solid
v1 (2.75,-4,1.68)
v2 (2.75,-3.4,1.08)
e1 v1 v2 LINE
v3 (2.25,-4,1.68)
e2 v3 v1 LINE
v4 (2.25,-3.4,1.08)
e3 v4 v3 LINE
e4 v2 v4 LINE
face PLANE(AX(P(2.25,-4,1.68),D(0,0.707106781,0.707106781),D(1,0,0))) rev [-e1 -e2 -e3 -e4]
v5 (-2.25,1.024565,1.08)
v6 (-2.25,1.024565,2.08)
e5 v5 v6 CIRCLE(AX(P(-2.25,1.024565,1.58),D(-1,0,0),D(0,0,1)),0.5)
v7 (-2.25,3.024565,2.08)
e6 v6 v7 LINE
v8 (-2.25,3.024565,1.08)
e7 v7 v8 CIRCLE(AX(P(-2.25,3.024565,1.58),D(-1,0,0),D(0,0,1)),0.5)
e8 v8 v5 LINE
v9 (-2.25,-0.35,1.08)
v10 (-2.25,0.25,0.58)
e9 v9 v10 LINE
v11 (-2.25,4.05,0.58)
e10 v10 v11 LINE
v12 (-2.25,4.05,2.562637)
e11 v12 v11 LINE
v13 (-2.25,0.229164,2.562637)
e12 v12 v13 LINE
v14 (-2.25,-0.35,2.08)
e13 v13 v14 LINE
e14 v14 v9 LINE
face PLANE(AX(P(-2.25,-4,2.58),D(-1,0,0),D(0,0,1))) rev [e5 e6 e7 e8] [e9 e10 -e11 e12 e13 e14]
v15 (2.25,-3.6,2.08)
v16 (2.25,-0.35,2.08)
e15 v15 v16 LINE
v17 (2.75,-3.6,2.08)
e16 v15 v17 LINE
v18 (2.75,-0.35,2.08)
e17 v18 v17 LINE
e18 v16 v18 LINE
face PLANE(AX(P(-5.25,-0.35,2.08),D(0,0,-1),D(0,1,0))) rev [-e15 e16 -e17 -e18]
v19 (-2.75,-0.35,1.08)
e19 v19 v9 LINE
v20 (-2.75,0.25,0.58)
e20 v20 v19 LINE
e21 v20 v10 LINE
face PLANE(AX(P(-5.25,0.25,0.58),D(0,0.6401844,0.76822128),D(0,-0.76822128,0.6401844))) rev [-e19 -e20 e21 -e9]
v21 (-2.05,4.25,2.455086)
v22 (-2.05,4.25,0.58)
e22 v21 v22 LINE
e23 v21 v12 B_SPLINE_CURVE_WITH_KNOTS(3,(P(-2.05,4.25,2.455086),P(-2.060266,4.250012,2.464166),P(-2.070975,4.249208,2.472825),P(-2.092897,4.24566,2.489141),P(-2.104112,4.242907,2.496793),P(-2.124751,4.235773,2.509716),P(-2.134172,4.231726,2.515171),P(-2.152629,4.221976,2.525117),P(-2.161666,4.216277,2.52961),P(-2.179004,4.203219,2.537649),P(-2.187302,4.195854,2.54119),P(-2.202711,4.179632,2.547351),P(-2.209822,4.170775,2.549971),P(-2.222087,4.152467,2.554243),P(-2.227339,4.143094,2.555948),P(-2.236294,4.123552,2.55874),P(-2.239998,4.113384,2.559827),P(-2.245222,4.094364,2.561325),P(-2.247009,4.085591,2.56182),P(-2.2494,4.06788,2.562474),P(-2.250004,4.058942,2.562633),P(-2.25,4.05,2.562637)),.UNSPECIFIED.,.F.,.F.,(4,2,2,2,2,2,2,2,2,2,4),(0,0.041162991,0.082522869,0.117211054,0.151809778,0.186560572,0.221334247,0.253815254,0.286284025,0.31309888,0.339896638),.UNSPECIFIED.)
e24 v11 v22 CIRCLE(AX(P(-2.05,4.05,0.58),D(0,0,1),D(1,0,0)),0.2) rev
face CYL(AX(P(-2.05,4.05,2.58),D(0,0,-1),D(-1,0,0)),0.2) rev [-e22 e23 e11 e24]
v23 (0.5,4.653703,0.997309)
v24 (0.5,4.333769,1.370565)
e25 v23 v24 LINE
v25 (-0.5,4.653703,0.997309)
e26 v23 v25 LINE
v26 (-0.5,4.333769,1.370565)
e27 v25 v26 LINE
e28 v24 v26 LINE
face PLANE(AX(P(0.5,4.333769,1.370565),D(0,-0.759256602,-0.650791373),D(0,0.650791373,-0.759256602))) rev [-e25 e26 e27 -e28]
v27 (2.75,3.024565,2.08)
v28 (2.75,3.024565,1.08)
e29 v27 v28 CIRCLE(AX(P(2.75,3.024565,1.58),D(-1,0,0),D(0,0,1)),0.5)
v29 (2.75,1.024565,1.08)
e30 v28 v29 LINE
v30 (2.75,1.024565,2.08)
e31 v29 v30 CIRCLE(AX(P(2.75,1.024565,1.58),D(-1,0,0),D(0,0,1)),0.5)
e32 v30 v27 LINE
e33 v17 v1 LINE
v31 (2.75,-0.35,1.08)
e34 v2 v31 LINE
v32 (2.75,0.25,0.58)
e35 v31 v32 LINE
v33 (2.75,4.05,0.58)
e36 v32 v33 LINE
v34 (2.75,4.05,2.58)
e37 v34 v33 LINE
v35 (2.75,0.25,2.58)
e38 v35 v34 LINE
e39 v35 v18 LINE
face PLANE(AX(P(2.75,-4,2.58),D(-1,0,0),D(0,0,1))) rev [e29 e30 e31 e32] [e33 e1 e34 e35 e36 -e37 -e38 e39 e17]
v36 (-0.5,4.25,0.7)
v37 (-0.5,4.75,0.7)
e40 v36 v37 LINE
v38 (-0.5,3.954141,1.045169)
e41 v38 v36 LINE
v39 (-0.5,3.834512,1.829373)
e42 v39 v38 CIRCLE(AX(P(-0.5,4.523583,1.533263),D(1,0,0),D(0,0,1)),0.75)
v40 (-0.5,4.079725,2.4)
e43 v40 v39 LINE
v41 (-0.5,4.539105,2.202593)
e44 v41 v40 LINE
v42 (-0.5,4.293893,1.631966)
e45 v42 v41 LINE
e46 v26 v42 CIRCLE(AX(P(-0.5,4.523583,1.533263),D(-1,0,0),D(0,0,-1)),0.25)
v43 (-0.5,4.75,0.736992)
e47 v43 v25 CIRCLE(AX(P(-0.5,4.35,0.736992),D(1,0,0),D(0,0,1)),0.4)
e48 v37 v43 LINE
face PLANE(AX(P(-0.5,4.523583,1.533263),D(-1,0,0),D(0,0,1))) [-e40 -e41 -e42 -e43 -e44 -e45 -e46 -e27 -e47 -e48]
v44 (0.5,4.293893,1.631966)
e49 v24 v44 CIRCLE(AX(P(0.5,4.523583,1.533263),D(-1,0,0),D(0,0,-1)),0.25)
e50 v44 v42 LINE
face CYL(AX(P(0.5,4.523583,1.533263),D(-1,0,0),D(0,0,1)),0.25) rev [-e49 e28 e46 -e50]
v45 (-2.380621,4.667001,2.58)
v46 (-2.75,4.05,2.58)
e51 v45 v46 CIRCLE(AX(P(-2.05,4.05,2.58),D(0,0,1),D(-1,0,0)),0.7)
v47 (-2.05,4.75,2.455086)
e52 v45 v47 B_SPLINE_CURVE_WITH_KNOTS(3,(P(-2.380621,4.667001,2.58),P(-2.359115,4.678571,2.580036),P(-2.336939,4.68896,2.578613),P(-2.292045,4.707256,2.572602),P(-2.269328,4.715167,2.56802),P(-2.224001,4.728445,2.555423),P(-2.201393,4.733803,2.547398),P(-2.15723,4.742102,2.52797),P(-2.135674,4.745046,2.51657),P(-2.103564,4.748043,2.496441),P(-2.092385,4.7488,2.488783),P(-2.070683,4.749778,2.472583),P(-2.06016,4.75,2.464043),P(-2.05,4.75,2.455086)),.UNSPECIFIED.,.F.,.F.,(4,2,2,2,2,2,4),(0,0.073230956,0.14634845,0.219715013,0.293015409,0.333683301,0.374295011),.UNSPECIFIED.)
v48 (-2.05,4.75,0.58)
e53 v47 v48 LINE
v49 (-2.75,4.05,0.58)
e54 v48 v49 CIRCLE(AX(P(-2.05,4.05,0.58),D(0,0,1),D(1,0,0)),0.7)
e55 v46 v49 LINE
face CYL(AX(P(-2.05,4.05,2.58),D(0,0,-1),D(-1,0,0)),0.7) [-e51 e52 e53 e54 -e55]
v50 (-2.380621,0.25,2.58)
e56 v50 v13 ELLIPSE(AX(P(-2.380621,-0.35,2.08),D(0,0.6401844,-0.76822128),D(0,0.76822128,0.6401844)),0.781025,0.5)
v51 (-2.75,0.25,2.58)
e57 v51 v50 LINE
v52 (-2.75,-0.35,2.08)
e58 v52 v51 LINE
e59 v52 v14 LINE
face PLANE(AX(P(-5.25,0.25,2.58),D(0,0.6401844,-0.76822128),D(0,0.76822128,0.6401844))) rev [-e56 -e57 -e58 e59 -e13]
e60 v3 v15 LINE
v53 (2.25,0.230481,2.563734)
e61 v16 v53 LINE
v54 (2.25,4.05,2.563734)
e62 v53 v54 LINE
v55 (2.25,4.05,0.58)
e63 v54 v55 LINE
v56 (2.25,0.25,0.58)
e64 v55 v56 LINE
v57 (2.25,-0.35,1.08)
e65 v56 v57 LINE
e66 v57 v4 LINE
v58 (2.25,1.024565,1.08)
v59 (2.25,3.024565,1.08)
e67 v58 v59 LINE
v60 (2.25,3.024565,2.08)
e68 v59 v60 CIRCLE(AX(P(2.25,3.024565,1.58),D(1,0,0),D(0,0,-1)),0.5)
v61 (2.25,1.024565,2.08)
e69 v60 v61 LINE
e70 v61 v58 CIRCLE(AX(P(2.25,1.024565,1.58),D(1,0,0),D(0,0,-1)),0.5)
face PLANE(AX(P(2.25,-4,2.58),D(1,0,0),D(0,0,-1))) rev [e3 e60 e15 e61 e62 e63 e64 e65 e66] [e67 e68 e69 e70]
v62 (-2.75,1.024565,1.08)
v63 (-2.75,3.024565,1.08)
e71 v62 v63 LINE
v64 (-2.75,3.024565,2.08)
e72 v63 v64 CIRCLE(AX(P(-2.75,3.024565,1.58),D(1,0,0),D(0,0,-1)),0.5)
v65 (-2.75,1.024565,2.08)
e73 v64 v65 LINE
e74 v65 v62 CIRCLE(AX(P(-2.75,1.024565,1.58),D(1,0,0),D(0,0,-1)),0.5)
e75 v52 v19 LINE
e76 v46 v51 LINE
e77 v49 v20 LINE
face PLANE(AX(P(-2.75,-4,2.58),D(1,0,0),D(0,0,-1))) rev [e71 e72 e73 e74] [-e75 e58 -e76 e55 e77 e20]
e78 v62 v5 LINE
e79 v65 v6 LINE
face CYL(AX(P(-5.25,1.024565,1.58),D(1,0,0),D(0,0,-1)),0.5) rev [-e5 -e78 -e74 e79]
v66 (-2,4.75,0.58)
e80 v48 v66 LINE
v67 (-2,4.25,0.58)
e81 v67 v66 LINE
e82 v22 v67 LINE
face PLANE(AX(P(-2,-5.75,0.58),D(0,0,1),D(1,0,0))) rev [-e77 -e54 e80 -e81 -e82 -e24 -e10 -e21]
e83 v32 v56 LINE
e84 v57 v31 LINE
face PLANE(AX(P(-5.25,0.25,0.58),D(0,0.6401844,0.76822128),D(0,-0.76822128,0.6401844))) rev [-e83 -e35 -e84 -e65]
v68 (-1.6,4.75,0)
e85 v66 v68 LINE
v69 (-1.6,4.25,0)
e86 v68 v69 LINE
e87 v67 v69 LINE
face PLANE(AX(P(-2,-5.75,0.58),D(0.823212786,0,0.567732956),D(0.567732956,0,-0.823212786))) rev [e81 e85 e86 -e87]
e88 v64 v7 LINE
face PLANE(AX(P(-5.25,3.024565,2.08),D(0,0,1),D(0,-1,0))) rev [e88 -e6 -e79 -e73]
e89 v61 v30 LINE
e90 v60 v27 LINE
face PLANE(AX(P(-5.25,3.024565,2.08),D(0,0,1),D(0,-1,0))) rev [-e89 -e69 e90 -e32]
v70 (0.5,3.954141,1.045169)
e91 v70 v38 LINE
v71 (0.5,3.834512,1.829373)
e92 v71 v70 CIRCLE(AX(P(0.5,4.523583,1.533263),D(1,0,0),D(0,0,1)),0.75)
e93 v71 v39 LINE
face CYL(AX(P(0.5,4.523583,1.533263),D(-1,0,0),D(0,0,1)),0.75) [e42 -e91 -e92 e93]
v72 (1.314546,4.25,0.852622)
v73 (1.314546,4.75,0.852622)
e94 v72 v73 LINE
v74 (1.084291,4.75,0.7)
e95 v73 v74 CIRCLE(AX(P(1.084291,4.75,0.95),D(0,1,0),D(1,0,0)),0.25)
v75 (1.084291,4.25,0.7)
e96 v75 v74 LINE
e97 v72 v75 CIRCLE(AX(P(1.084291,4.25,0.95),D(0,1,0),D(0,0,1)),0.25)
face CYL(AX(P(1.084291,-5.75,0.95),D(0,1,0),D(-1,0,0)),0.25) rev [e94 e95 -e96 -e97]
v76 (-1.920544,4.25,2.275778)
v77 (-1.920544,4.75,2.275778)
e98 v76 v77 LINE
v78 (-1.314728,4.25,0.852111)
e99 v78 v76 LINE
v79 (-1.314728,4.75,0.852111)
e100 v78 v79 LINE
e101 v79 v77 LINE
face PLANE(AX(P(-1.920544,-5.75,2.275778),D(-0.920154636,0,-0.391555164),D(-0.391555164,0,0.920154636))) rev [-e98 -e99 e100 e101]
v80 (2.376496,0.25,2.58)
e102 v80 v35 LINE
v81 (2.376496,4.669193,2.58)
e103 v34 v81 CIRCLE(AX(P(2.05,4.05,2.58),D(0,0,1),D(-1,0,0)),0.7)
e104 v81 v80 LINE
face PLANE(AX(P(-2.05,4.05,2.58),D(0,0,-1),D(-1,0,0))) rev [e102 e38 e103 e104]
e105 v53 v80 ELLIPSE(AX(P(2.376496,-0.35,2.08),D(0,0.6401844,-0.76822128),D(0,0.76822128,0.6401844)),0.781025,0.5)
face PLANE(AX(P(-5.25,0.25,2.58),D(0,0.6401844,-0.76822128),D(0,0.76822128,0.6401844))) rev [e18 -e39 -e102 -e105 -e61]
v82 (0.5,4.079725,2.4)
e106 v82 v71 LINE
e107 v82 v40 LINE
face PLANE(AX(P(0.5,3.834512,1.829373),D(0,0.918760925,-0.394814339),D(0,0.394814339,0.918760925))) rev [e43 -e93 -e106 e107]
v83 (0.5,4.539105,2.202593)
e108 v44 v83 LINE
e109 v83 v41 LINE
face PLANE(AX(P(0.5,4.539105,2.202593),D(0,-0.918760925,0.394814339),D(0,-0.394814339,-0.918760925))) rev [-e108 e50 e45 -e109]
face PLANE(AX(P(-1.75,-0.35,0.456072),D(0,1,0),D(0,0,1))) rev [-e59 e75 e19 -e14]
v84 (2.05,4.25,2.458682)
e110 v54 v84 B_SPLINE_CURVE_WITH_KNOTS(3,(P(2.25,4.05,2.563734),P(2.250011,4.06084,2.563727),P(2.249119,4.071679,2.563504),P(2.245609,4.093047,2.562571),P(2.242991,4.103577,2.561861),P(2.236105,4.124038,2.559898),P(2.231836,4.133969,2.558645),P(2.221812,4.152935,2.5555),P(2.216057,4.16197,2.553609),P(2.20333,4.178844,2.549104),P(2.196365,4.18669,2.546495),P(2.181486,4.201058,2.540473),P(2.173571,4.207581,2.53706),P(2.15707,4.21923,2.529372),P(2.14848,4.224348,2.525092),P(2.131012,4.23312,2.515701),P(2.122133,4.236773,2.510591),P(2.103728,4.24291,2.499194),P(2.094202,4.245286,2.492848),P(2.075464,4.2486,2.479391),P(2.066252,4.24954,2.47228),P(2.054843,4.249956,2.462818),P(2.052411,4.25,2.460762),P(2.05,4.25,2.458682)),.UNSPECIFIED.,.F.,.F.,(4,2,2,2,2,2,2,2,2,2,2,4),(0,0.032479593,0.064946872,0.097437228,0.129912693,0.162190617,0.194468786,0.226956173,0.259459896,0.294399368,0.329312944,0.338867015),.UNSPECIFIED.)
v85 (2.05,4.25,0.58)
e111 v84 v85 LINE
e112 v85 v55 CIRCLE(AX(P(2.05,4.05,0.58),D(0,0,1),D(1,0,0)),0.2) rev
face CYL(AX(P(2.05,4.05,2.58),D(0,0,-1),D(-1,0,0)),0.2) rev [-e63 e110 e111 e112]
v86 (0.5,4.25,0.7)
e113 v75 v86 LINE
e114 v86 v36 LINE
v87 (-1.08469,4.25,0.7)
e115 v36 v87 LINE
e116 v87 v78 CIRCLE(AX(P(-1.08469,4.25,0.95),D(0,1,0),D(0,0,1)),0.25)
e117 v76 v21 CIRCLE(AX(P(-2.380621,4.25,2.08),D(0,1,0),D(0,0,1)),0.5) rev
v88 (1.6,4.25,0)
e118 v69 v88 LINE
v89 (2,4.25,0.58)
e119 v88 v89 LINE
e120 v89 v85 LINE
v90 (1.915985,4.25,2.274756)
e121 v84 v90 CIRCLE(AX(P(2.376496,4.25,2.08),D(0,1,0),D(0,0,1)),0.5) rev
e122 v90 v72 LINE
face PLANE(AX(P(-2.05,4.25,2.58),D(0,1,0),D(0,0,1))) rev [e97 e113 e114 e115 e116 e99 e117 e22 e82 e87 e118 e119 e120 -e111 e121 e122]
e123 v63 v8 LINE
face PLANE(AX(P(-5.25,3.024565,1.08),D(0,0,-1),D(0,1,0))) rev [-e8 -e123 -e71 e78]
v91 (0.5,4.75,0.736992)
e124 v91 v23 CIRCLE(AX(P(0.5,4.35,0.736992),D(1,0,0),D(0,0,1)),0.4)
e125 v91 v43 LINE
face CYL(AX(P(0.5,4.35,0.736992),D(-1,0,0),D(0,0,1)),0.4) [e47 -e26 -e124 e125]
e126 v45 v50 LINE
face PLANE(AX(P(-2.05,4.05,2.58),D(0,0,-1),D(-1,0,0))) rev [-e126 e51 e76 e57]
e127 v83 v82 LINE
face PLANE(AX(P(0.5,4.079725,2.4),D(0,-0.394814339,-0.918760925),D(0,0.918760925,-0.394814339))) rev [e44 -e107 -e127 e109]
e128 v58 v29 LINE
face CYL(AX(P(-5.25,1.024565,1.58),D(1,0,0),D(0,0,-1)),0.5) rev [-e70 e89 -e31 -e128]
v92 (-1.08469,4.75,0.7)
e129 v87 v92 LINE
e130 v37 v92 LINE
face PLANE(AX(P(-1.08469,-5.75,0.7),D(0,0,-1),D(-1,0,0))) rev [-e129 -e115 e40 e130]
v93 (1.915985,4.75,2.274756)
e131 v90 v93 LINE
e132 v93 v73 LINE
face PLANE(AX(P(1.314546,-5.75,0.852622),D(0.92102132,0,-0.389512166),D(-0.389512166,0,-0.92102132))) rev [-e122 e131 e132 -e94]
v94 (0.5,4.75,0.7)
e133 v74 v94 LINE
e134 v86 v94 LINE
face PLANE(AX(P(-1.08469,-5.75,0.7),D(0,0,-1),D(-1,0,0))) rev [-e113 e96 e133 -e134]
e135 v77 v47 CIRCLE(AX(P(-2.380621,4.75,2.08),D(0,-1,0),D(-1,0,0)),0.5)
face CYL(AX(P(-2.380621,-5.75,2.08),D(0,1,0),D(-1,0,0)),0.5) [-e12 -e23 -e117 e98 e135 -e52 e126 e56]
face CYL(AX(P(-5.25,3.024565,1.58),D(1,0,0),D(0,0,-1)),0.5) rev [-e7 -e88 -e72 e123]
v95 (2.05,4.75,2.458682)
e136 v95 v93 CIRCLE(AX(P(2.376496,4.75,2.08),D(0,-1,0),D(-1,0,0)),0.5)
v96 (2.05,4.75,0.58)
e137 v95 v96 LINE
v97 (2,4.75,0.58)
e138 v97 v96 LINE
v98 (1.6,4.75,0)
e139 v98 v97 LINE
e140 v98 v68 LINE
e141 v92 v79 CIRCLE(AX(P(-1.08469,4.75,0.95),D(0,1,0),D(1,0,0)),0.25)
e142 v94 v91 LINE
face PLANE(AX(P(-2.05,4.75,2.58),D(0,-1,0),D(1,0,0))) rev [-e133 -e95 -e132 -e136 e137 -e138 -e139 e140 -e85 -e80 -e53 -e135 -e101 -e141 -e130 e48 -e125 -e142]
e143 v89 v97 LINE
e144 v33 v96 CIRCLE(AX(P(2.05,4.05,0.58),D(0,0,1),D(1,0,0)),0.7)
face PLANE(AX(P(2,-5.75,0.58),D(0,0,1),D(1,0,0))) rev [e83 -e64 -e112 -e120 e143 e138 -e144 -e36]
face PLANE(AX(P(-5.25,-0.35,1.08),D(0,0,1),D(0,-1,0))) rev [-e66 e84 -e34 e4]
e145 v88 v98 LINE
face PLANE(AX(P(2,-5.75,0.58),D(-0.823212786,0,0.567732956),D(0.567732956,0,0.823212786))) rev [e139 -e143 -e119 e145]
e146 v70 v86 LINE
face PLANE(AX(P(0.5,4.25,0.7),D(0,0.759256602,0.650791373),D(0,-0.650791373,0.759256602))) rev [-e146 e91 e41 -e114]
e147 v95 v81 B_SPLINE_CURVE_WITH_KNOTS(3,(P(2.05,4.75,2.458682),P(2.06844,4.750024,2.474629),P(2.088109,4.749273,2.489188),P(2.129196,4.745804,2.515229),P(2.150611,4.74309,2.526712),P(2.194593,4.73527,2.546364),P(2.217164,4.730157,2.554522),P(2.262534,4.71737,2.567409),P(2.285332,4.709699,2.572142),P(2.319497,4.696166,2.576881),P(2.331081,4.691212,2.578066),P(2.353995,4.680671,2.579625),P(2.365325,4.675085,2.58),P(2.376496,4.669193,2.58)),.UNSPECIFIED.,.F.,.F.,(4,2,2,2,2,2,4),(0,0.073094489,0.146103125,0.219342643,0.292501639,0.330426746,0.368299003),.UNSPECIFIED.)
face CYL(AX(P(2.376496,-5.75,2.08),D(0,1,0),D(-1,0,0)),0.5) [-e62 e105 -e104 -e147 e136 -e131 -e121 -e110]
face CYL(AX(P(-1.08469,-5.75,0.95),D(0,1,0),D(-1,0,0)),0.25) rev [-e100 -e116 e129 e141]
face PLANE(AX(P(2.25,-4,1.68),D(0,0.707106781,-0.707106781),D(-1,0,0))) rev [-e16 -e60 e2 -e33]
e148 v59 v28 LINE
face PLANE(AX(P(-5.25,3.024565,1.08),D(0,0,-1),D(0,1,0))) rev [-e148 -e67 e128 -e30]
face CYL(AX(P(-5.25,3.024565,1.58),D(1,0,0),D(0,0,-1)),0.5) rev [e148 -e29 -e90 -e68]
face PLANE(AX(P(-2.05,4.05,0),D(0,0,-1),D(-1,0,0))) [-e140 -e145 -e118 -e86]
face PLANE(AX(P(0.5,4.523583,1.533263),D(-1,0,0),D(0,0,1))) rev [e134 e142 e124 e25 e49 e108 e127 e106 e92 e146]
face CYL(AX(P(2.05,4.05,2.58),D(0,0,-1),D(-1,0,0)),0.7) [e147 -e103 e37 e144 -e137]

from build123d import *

# Parameters (mm, degrees)
BOSS_EXTRUDE1_DEPTH = 2.58
CUT_EXTRUDE1_DEPTH  = 10.5
CUT_EXTRUDE2_DEPTH  = 5.25
BOSS_EXTRUDE2_DEPTH = 0.5
SKETCH5_W           = 2.430822105
SKETCH5_H           = 5.029930807
CUT_EXTRUDE3_DEPTH  = 1
CHAMFER1_SIZE       = 0.6
CHAMFER2_SIZE       = 0.4


with BuildPart() as part:
    # Sketch1 → Boss-Extrude1 (new body)
    with BuildSketch(Plane.XY):
        with BuildLine():
            Line((-2.75, -4), (-2.75, 4.05))
            ThreePointArc((-2.75, 4.05), (-2.544974747, 4.544974747), (-2.05, 4.75))
            Line((-2.05, 4.75), (2.05, 4.75))
            ThreePointArc((2.05, 4.75), (2.544974747, 4.544974747), (2.75, 4.05))
            Line((2.75, 4.05), (2.75, -4))
            Line((2.75, -4), (2.25, -4))
            Line((2.25, -4), (2.25, 4.05))
            ThreePointArc((2.25, 4.05), (2.191421356, 4.191421356), (2.05, 4.25))
            Line((2.05, 4.25), (-2.05, 4.25))
            ThreePointArc((-2.05, 4.25), (-2.191421356, 4.191421356), (-2.25, 4.05))
            Line((-2.25, 4.05), (-2.25, -4))
            Line((-2.25, -4), (-2.75, -4))
        make_face()
    extrude(amount=BOSS_EXTRUDE1_DEPTH)

    # Sketch2 → Cut-Extrude1 (cut)
    with BuildSketch(Plane(origin=(0, 4.75, 0), x_dir=(1, 0, 0), z_dir=(0, 1, 0))):
        Polygon((-2, -0.58), (-4.099439411, -0.58), (-4.099439411, 0.833357165), (-2, 0.833357165), (-1.6, 0), align=None)
        Polygon((2, -0.58), (3.357409655, -0.58), (3.357409655, 0.833357165), (2, 0.833357165), (1.6, 0), align=None)
        with BuildLine():
            Line((-2.75, -2.58), (-2.38062097, -2.58))
            ThreePointArc((-2.38062097, -2.58), (-2.104839164, -2.497066416), (-1.920543652, -2.275777582))
            Line((-1.920543652, -2.275777582), (-1.314728174, -0.852111209))
            ThreePointArc((-1.314728174, -0.852111209), (-1.222580418, -0.741466792), (-1.084689515, -0.7))
            Line((-1.084689515, -0.7), (1.084290526, -0.7))
            ThreePointArc((1.084290526, -0.7), (1.222412736, -0.741619926), (1.314545856, -0.852621958))
            Line((1.314545856, -0.852621958), (1.915985292, -2.274756083))
            ThreePointArc((1.915985292, -2.274756083), (2.100251533, -2.496760148), (2.376495952, -2.58))
            Line((2.376495952, -2.58), (2.75, -2.58))
            Line((2.75, -2.58), (2.75, -3.056093585))
            Line((2.75, -3.056093585), (-2.75, -3.056093585))
            Line((-2.75, -3.056093585), (-2.75, -2.58))
        make_face()
    extrude(amount=-CUT_EXTRUDE1_DEPTH, mode=Mode.SUBTRACT)

    # Sketch3 → Cut-Extrude2 (cut, symmetric)
    with BuildSketch(Plane(origin=(0, 0, 0), x_dir=(0, 0, -1), z_dir=(1, 0, 0))):
        Polygon((-0.58, 0.25), (-1.08, -0.35), (-1.08, -4.396314828), (-0.130305992, -4.396314828), (-0.130305992, 0.25), align=None)
        Polygon((-2.58, 0.25), (-2.08, -0.35), (-2.08, -4.896314828), (-3.070294312, -4.896314828), (-3.070294312, 0.25), align=None)
        with BuildLine():
            Line((-1.08, 3.024565065), (-1.08, 1.024565065))
            ThreePointArc((-1.08, 1.024565065), (-1.58, 0.524565065), (-2.08, 1.024565065))
            Line((-2.08, 1.024565065), (-2.08, 3.024565065))
            ThreePointArc((-2.08, 3.024565065), (-1.58, 3.524565065), (-1.08, 3.024565065))
        make_face()
    extrude(amount=CUT_EXTRUDE2_DEPTH, both=True, mode=Mode.SUBTRACT)

    # Sketch4 → Boss-Extrude2 (add, symmetric)
    with BuildSketch(Plane(origin=(0, 0, 0), x_dir=(0, 0, -1), z_dir=(1, 0, 0))):
        with BuildLine():
            Line((-0.7, 4.25), (-1.045169213, 3.954140675))
            ThreePointArc((-1.045169213, 3.954140675), (-1.420160684, 3.782160221), (-1.829373497, 3.834512432))
            Line((-1.829373497, 3.834512432), (-2.4, 4.079724782))
            Line((-2.4, 4.079724782), (-2.202592831, 4.539105245))
            Line((-2.202592831, 4.539105245), (-1.631966328, 4.293892895))
            ThreePointArc((-1.631966328, 4.293892895), (-1.495562057, 4.276442158), (-1.3705649, 4.333768976))
            Line((-1.3705649, 4.333768976), (-0.997308957, 4.653702641))
            ThreePointArc((-0.997308957, 4.653702641), (-0.875770907, 4.725154006), (-0.736992408, 4.75))
            Line((-0.736992408, 4.75), (-0.7, 4.75))
            Line((-0.7, 4.75), (-0.7, 4.25))
        make_face()
    extrude(amount=BOSS_EXTRUDE2_DEPTH, both=True)

    # Sketch5 → Cut-Extrude3 (cut)
    with BuildSketch(Plane.ZY.offset(2.75)):
        with Locations((1.671482724, -2.864965403)):
            Rectangle(SKETCH5_W, SKETCH5_H)
    extrude(amount=-CUT_EXTRUDE3_DEPTH, mode=Mode.SUBTRACT)

    # Chamfer1
    chamfer1_edges = [part.edges().sort_by_distance(p)[0] for p in [
        (2.5, -4, 1.08),
    ]]
    chamfer(chamfer1_edges, length=CHAMFER1_SIZE)

    # Chamfer2
    chamfer2_edges = [part.edges().sort_by_distance(p)[0] for p in [
        (2.5, -4, 2.08),
    ]]
    chamfer(chamfer2_edges, length=CHAMFER2_SIZE - 0.0001)  # a hair under: the kernel refuses the full size


solid = part.part
